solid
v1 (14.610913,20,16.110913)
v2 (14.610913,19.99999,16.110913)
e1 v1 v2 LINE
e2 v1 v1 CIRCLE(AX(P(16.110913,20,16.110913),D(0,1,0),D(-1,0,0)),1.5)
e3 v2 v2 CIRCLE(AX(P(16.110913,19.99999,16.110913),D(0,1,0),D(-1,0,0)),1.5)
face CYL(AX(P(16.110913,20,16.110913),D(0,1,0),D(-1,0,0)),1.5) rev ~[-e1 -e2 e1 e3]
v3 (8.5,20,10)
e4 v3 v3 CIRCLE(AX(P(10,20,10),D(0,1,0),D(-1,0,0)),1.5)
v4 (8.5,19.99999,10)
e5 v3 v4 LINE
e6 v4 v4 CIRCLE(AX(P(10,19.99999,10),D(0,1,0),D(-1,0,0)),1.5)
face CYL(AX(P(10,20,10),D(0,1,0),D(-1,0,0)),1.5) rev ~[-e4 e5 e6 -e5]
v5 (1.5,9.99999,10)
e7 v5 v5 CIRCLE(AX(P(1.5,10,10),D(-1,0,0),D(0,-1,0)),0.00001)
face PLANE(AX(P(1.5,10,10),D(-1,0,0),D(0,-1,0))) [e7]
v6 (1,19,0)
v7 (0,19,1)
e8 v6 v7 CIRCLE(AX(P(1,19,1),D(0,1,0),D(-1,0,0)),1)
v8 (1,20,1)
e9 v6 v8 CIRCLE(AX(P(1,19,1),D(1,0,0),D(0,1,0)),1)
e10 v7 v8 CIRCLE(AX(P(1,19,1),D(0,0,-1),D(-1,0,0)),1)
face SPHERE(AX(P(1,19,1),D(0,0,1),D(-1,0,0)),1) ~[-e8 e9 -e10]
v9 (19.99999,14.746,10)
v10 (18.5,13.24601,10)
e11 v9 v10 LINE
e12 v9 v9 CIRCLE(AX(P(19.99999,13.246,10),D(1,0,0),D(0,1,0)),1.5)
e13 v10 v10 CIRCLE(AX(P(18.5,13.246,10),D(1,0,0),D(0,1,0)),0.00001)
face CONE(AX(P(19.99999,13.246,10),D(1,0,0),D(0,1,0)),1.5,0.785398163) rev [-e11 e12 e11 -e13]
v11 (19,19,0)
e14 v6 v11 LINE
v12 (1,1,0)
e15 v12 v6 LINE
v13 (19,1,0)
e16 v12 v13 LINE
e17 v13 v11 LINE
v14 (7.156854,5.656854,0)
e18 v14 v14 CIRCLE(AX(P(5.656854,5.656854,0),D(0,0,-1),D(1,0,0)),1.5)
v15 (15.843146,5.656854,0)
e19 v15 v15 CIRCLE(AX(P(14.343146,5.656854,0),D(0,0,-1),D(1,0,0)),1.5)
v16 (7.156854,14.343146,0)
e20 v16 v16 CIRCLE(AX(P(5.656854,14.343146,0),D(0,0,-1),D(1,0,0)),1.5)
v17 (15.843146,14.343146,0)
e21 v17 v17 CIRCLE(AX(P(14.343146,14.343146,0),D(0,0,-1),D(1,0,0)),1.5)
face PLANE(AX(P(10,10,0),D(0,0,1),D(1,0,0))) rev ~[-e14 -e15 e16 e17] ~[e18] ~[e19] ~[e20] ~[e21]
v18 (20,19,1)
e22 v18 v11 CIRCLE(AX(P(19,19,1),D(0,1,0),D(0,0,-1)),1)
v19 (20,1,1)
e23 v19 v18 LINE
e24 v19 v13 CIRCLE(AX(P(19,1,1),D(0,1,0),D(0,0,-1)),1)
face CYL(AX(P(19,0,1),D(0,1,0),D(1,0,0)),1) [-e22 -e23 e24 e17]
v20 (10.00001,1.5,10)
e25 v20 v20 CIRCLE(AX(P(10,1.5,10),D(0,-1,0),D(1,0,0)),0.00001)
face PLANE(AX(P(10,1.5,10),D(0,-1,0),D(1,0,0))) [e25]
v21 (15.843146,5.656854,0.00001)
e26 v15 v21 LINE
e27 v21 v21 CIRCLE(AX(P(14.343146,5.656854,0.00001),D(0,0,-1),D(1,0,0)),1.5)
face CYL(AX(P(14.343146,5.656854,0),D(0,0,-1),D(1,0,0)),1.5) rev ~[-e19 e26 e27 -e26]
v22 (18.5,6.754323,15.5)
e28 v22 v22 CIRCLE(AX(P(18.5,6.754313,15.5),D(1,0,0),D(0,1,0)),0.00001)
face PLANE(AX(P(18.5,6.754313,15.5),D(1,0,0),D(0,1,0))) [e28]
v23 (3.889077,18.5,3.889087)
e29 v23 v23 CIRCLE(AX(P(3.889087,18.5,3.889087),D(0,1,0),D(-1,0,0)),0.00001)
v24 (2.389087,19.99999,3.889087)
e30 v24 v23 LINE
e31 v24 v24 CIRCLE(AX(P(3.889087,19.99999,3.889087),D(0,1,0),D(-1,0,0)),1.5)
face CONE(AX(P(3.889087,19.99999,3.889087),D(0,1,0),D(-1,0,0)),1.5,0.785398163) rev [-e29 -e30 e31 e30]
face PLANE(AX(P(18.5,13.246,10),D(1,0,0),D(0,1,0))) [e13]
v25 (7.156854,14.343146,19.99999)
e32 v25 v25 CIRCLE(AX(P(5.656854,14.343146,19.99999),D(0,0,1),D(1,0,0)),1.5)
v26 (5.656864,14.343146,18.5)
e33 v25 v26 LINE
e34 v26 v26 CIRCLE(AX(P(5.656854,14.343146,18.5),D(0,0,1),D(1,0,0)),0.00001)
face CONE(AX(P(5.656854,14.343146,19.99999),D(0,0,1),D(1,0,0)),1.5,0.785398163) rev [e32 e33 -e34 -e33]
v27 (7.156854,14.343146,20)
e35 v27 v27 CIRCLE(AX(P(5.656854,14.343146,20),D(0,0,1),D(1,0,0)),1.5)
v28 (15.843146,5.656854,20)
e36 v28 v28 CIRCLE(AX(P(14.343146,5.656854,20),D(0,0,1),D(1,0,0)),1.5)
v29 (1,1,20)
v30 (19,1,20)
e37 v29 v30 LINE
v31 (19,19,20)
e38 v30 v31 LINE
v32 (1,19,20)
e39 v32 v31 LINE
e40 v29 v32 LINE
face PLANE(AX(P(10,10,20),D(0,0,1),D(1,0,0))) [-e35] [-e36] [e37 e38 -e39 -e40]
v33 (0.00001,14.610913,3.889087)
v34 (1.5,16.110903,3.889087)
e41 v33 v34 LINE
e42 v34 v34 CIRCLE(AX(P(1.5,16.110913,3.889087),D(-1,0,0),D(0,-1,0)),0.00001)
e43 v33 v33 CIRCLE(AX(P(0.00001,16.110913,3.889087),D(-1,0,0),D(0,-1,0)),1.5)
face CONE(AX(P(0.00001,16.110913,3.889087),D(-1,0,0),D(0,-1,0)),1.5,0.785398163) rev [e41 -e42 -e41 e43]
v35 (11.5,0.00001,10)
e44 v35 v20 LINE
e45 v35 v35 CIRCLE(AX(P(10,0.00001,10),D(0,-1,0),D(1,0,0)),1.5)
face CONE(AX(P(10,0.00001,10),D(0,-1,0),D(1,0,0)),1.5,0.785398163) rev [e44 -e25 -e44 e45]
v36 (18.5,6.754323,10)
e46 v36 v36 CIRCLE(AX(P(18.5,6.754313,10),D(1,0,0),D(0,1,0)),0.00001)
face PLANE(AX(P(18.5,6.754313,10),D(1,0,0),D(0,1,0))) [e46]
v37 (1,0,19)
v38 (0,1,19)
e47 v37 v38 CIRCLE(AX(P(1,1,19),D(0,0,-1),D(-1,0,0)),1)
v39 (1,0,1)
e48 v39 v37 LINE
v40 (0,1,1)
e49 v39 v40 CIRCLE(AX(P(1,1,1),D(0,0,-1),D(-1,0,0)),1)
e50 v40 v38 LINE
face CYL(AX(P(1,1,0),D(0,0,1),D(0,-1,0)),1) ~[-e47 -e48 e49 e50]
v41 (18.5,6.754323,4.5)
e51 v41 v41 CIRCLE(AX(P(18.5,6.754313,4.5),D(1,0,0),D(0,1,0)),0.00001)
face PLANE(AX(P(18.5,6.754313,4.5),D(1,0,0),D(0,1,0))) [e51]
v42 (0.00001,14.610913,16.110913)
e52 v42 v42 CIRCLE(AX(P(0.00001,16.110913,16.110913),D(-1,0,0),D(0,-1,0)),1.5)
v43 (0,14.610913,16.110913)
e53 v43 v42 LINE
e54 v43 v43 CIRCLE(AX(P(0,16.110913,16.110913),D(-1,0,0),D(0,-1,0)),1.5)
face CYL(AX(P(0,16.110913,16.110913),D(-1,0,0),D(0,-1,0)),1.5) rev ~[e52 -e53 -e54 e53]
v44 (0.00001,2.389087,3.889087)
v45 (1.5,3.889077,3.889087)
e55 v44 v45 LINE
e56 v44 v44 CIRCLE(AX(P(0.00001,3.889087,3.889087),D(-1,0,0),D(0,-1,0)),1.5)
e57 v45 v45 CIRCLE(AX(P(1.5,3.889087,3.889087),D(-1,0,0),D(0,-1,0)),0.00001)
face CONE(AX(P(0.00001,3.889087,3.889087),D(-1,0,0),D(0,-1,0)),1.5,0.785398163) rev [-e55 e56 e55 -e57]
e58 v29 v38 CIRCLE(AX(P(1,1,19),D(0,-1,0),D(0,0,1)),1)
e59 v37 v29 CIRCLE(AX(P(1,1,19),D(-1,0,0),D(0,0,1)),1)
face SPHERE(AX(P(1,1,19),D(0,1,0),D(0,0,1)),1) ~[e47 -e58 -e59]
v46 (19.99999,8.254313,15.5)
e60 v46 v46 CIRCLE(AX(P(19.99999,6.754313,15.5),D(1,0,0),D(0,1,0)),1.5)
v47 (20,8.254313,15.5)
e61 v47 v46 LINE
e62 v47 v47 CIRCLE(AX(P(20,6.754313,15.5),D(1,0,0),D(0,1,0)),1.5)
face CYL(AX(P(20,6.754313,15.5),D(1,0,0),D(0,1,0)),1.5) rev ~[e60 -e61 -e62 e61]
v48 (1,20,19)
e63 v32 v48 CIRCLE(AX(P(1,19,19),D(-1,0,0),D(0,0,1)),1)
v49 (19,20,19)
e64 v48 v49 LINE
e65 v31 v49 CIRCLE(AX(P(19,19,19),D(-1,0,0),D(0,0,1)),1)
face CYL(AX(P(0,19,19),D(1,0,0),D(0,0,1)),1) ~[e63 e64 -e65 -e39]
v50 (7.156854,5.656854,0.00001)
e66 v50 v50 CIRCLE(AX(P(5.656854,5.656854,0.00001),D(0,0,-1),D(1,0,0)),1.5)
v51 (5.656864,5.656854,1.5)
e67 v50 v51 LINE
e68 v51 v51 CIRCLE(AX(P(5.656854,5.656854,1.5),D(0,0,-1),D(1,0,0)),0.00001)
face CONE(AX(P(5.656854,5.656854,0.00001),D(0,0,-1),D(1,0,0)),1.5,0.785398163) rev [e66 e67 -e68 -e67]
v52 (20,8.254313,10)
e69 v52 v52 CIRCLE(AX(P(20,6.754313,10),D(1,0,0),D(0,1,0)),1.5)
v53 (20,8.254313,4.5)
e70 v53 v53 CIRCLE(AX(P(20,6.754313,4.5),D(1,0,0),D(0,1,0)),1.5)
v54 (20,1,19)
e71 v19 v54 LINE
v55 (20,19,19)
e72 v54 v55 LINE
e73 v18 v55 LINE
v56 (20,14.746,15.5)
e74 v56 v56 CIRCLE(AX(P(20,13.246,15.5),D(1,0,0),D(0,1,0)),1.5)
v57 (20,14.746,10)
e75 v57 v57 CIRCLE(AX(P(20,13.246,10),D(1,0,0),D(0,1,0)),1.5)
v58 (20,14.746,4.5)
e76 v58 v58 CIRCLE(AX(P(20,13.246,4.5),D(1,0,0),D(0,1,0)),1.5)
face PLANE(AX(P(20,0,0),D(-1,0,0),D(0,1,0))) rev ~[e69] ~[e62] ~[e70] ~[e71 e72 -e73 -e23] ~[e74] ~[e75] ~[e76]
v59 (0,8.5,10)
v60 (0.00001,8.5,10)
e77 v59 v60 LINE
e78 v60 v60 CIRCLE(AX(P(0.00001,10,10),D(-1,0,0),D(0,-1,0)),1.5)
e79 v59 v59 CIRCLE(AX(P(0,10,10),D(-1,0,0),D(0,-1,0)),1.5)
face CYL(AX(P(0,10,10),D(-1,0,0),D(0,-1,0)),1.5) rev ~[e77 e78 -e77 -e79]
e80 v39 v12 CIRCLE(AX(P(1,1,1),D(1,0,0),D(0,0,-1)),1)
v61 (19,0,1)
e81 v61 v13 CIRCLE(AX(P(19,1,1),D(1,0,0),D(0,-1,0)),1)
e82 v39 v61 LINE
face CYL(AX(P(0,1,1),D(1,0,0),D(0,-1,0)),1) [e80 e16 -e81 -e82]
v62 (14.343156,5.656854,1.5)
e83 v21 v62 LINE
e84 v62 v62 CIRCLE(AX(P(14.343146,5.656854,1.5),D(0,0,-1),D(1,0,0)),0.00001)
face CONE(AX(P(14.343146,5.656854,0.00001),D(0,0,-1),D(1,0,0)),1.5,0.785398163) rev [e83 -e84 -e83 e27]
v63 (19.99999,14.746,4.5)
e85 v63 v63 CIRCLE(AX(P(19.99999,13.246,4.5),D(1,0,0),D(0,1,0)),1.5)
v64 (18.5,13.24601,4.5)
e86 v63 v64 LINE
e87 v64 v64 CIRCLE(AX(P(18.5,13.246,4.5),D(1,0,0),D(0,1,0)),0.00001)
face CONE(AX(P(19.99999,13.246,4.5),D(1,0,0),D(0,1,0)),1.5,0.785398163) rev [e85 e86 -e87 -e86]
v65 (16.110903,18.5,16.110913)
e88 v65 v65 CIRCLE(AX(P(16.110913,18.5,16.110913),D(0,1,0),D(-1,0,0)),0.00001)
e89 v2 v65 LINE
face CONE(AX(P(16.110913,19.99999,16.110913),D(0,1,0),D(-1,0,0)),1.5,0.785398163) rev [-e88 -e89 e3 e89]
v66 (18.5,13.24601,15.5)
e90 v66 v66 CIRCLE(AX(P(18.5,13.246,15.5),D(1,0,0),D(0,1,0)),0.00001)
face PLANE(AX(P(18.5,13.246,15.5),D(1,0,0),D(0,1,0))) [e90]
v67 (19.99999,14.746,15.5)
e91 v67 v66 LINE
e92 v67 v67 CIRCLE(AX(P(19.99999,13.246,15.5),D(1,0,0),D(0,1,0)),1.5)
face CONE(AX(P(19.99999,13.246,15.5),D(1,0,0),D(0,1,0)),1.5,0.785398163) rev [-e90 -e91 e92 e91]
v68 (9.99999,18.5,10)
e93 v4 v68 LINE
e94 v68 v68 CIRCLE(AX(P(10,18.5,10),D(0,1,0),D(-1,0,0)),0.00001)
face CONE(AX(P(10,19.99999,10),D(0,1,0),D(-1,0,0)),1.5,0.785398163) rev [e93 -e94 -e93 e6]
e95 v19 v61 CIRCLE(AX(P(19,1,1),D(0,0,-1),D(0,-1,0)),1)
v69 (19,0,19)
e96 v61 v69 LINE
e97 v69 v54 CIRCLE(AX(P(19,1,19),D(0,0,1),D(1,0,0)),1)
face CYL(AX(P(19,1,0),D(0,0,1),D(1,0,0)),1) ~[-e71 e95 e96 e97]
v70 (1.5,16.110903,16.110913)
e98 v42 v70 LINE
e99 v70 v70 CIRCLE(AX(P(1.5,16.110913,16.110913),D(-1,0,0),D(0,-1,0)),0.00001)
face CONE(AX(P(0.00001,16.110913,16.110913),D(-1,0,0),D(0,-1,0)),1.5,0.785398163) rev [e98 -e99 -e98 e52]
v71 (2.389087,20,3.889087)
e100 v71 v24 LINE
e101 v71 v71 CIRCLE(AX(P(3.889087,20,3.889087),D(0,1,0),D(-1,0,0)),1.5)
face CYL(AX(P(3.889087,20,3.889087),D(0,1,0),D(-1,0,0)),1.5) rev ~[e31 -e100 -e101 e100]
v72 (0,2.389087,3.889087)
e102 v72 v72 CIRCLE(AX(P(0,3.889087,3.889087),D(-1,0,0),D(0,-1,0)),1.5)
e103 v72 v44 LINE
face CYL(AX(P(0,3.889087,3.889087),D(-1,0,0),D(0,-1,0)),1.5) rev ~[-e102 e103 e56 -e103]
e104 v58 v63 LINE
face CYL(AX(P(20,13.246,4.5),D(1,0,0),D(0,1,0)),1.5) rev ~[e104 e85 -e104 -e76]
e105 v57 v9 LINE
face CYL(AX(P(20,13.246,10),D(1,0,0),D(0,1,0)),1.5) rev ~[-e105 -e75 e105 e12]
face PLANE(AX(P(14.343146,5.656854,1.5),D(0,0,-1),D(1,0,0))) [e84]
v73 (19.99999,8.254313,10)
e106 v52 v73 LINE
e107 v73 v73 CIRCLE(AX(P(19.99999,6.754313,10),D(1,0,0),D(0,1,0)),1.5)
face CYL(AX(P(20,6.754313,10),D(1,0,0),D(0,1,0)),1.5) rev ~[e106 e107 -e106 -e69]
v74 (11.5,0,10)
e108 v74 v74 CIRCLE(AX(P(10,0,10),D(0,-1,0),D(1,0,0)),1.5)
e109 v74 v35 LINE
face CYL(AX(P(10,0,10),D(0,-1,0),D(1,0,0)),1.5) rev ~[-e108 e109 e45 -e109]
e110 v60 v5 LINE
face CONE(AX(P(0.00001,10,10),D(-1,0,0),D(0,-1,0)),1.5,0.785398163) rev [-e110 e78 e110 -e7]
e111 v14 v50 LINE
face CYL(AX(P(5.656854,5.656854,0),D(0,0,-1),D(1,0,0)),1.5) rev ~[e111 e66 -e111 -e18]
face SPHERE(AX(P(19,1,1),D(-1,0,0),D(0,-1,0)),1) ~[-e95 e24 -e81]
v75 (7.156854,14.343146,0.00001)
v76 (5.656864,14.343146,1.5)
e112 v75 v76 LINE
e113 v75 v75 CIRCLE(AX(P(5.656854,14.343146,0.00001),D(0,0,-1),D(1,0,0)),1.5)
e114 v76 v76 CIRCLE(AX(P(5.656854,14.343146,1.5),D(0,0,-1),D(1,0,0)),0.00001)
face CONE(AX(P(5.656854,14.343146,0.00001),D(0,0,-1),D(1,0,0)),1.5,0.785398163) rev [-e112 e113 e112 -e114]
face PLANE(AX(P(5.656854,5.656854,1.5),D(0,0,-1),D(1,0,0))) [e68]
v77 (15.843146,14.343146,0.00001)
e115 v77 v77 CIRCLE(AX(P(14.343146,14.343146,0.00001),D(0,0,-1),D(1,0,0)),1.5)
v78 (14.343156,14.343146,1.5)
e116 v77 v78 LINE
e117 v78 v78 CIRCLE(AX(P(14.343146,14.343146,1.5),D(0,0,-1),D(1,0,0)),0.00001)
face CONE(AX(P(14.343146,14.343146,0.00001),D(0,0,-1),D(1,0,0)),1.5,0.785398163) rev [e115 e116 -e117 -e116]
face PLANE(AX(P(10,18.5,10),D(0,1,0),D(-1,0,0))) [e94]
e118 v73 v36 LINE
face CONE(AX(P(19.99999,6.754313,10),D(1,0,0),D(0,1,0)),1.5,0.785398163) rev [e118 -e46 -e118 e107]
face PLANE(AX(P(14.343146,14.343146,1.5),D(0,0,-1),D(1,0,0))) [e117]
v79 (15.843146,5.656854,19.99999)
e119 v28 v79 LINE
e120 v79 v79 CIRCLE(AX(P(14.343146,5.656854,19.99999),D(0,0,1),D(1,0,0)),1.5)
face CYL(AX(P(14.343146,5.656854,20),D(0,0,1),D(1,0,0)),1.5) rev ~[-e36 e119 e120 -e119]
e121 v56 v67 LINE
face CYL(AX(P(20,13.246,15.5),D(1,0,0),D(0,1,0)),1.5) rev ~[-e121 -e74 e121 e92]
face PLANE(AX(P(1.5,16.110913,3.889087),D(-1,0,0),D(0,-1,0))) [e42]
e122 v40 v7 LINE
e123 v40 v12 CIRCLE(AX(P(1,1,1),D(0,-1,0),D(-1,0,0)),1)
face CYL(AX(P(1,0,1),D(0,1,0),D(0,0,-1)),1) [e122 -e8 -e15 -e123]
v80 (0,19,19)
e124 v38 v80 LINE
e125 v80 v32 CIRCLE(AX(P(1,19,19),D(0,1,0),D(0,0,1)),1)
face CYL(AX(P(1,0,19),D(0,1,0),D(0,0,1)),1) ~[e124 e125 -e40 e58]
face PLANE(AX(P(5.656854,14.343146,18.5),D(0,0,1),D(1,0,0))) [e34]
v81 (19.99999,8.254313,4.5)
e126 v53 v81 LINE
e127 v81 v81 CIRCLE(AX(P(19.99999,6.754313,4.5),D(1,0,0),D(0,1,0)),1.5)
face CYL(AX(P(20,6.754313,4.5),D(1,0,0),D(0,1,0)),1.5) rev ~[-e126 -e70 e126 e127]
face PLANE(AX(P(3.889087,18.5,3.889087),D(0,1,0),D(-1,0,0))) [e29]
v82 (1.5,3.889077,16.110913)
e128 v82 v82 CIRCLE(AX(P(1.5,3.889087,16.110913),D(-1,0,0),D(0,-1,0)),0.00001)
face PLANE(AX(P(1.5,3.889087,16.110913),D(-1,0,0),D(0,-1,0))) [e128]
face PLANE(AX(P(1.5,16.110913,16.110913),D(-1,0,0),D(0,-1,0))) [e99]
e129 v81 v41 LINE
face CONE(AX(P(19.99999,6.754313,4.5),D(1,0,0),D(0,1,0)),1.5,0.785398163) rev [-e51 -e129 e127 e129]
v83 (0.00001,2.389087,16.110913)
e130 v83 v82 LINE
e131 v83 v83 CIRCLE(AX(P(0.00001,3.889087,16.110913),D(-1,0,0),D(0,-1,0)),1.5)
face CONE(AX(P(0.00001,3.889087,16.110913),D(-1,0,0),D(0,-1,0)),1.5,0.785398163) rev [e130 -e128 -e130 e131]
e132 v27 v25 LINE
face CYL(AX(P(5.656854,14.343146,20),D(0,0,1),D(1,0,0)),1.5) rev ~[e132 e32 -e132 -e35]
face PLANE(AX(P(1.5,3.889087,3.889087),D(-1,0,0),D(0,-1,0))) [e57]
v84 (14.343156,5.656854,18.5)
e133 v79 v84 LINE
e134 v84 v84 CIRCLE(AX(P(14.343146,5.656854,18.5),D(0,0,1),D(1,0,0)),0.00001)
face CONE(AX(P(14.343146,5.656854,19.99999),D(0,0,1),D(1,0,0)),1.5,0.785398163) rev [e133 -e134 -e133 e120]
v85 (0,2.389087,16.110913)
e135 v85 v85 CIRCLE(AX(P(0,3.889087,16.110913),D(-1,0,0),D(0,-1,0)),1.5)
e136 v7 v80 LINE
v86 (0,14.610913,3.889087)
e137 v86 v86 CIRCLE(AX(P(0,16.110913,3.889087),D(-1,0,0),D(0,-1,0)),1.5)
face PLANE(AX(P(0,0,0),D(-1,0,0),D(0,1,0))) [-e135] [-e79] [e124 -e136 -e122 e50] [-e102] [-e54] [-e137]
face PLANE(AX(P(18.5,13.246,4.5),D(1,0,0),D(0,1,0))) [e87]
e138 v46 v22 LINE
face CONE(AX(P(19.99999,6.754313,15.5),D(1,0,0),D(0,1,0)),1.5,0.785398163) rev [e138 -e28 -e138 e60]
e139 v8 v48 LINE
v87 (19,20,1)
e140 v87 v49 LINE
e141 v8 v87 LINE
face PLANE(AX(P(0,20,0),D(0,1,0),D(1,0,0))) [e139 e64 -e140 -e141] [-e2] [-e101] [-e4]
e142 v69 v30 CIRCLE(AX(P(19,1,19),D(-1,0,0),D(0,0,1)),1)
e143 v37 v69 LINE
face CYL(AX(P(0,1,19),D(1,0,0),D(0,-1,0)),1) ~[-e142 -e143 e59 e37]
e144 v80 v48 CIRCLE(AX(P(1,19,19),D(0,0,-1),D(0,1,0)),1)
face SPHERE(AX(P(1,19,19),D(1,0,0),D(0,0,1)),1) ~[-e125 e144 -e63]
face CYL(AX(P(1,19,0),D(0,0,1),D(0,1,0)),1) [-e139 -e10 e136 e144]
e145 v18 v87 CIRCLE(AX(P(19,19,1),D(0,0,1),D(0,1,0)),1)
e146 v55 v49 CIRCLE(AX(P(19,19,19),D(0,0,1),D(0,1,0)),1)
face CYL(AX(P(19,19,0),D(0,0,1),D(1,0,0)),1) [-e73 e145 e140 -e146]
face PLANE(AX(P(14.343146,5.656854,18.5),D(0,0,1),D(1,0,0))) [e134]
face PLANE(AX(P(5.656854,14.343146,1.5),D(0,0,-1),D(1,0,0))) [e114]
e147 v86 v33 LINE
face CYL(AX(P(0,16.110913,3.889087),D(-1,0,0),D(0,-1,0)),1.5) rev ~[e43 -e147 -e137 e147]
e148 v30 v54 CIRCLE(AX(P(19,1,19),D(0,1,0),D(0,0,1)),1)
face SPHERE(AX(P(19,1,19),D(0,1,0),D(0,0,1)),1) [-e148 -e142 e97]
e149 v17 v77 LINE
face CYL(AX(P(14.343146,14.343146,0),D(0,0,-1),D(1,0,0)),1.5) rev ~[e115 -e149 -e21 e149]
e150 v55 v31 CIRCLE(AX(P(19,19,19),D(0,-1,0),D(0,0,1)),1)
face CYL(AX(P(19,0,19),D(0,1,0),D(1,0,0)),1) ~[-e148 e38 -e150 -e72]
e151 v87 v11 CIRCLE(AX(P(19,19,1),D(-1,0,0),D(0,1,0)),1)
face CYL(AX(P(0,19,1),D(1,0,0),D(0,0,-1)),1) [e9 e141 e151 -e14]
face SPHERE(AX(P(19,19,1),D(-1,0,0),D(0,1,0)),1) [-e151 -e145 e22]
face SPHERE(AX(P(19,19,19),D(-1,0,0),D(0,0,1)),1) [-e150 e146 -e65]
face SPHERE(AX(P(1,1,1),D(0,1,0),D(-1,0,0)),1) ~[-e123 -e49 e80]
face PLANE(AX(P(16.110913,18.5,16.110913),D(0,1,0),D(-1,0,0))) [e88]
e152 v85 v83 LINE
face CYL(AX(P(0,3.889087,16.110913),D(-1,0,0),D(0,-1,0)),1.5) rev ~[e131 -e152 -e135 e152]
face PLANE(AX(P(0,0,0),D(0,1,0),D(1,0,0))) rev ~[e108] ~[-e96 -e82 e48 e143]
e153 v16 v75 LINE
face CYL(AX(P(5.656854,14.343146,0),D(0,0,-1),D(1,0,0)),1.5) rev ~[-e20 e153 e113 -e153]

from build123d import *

# Parameters (mm, degrees)
F0_W      = 20
F0_H      = 20
F1_DEPTH  = 20
F2_R      = 1.5
F3_DEPTH  = 1.5
F4_R      = 1.5
F5_DEPTH  = 1.5
F6_SIZE   = 1.49999
F7_SIZE   = 1.49999
F8_R      = 1.5
F9_DEPTH  = 1.5
F10_SIZE  = 1.49999
F11_R     = 1.5
F12_DEPTH = 1.5
F13_SIZE  = 1.49999
F14_R     = 1.5
F15_DEPTH = 1.5
F16_SIZE  = 1.49999
F17_R     = 1.5
F18_DEPTH = 1.5
F19_SIZE  = 1.49999
F20_R     = 1


# Not quite as in the source:
# - a fillet or chamfer is up to 0.001 mm smaller than in the source, because OpenCascade refuses the exact size


with BuildPart() as f1:
    # F0 (on Top) → F1 (new body)
    with BuildSketch(Plane.XY):
        with Locations((10, 10)):
            Rectangle(F0_W, F0_H)
    extrude(amount=F1_DEPTH)

    # F2 (on face) → F3 (cut)
    with BuildSketch(Plane.XZ):
        with Locations((10, 10)):
            Circle(F2_R)
    extrude(amount=-F3_DEPTH, mode=Mode.SUBTRACT)

    # F4 (on face) → F5 (cut)
    with BuildSketch(Plane.XY.offset(20)):
        with Locations((5.6568542495, 14.3431457505)):
            Circle(F4_R)
        with Locations((14.3431457505, 5.6568542495)):
            Circle(F4_R)
    extrude(amount=-F5_DEPTH, mode=Mode.SUBTRACT)

    # F6 (size 1.5 in the source; OpenCascade refuses exactly that, so slightly less here)
    f6_edges = [f1.edges().sort_by_distance(p)[0] for p in [
        (12.843146, 5.656854, 18.5),
        (4.156854, 14.343146, 18.5),
    ]]
    chamfer(f6_edges, length=F6_SIZE)

    # F7 (size 1.5 in the source; OpenCascade refuses exactly that, so slightly less here)
    f7_edges = [f1.edges().sort_by_distance(p)[0] for p in [
        (8.5, 1.5, 10),
    ]]
    chamfer(f7_edges, length=F7_SIZE)

    # F8 (on face) → F9 (cut)
    with BuildSketch(Plane(origin=(0, 20, 0), x_dir=(-1, 0, 0), z_dir=(0, 1, 0))):
        with Locations((-16.1109127035, 16.1109127035)):
            Circle(F8_R)
        with Locations((-10, 10)):
            Circle(F8_R)
        with Locations((-3.8890872965, 3.8890872965)):
            Circle(F8_R)
    extrude(amount=-F9_DEPTH, mode=Mode.SUBTRACT)

    # F10 (size 1.5 in the source; OpenCascade refuses exactly that, so slightly less here)
    f10_edges = [f1.edges().sort_by_distance(p)[0] for p in [
        (17.610913, 18.5, 16.110913),
        (11.5, 18.5, 10),
        (5.389087, 18.5, 3.889087),
    ]]
    chamfer(f10_edges, length=F10_SIZE)

    # F11 (on face) → F12 (cut)
    with BuildSketch(Plane(origin=(0, 0, 0), x_dir=(1, 0, 0), z_dir=(0, 0, -1))):
        with Locations((5.6568542495, -5.6568542495)):
            Circle(F11_R)
        with Locations((14.3431457505, -5.6568542495)):
            Circle(F11_R)
        with Locations((14.3431457505, -14.3431457505)):
            Circle(F11_R)
        with Locations((5.6568542495, -14.3431457505)):
            Circle(F11_R)
    extrude(amount=-F12_DEPTH, mode=Mode.SUBTRACT)

    # F13 (size 1.5 in the source; OpenCascade refuses exactly that, so slightly less here)
    f13_edges = [f1.edges().sort_by_distance(p)[0] for p in [
        (4.156854, 14.343146, 1.5),
        (4.156854, 5.656854, 1.5),
        (12.843146, 5.656854, 1.5),
        (12.843146, 14.343146, 1.5),
    ]]
    chamfer(f13_edges, length=F13_SIZE)

    # F14 (on face) → F15 (cut)
    with BuildSketch(Plane(origin=(0, 0, 0), x_dir=(0, -1, 0), z_dir=(-1, 0, 0))):
        with Locations((-16.1109127035, 16.1109127035)):
            Circle(F14_R)
        with Locations((-3.8890872965, 16.1109127035)):
            Circle(F14_R)
        with Locations((-10, 10)):
            Circle(F14_R)
        with Locations((-16.1109127035, 3.8890872965)):
            Circle(F14_R)
        with Locations((-3.8890872965, 3.8890872965)):
            Circle(F14_R)
    extrude(amount=-F15_DEPTH, mode=Mode.SUBTRACT)

    # F16 (size 1.5 in the source; OpenCascade refuses exactly that, so slightly less here)
    f16_edges = [f1.edges().sort_by_distance(p)[0] for p in [
        (1.5, 17.610913, 16.110913),
        (1.5, 5.389087, 16.110913),
        (1.5, 11.5, 10),
        (1.5, 5.389087, 3.889087),
        (1.5, 17.610913, 3.889087),
    ]]
    chamfer(f16_edges, length=F16_SIZE)

    # F17 (on face) → F18 (cut)
    with BuildSketch(Plane.YZ.offset(20)):
        with Locations((6.7543126643, 15.5)):
            Circle(F17_R)
        with Locations((13.246, 4.5)):
            Circle(F17_R)
        with Locations((6.7543126643, 4.5)):
            Circle(F17_R)
        with Locations((13.246, 15.5)):
            Circle(F17_R)
        with Locations((13.246, 10)):
            Circle(F17_R)
        with Locations((6.7543126643, 10)):
            Circle(F17_R)
    extrude(amount=-F18_DEPTH, mode=Mode.SUBTRACT)

    # F19 (size 1.5 in the source; OpenCascade refuses exactly that, so slightly less here)
    f19_edges = [f1.edges().sort_by_distance(p)[0] for p in [
        (18.5, 5.254313, 15.5),
        (18.5, 11.746, 15.5),
        (18.5, 5.254313, 10),
        (18.5, 11.746, 10),
        (18.5, 11.746, 4.5),
        (18.5, 5.254313, 4.5),
    ]]
    chamfer(f19_edges, length=F19_SIZE)

    # F20
    f20_edges = [f1.edges().sort_by_distance(p)[0] for p in [
        (10, 20, 20),
        (20, 10, 20),
        (0, 10, 20),
        (10, 0, 20),
        (0, 20, 10),
        (0, 10, 0),
        (10, 20, 0),
        (20, 20, 10),
        (0, 0, 10),
        (10, 0, 0),
        (20, 0, 10),
        (20, 10, 0),
    ]]
    fillet(f20_edges, radius=F20_R)


solid = f1.part
